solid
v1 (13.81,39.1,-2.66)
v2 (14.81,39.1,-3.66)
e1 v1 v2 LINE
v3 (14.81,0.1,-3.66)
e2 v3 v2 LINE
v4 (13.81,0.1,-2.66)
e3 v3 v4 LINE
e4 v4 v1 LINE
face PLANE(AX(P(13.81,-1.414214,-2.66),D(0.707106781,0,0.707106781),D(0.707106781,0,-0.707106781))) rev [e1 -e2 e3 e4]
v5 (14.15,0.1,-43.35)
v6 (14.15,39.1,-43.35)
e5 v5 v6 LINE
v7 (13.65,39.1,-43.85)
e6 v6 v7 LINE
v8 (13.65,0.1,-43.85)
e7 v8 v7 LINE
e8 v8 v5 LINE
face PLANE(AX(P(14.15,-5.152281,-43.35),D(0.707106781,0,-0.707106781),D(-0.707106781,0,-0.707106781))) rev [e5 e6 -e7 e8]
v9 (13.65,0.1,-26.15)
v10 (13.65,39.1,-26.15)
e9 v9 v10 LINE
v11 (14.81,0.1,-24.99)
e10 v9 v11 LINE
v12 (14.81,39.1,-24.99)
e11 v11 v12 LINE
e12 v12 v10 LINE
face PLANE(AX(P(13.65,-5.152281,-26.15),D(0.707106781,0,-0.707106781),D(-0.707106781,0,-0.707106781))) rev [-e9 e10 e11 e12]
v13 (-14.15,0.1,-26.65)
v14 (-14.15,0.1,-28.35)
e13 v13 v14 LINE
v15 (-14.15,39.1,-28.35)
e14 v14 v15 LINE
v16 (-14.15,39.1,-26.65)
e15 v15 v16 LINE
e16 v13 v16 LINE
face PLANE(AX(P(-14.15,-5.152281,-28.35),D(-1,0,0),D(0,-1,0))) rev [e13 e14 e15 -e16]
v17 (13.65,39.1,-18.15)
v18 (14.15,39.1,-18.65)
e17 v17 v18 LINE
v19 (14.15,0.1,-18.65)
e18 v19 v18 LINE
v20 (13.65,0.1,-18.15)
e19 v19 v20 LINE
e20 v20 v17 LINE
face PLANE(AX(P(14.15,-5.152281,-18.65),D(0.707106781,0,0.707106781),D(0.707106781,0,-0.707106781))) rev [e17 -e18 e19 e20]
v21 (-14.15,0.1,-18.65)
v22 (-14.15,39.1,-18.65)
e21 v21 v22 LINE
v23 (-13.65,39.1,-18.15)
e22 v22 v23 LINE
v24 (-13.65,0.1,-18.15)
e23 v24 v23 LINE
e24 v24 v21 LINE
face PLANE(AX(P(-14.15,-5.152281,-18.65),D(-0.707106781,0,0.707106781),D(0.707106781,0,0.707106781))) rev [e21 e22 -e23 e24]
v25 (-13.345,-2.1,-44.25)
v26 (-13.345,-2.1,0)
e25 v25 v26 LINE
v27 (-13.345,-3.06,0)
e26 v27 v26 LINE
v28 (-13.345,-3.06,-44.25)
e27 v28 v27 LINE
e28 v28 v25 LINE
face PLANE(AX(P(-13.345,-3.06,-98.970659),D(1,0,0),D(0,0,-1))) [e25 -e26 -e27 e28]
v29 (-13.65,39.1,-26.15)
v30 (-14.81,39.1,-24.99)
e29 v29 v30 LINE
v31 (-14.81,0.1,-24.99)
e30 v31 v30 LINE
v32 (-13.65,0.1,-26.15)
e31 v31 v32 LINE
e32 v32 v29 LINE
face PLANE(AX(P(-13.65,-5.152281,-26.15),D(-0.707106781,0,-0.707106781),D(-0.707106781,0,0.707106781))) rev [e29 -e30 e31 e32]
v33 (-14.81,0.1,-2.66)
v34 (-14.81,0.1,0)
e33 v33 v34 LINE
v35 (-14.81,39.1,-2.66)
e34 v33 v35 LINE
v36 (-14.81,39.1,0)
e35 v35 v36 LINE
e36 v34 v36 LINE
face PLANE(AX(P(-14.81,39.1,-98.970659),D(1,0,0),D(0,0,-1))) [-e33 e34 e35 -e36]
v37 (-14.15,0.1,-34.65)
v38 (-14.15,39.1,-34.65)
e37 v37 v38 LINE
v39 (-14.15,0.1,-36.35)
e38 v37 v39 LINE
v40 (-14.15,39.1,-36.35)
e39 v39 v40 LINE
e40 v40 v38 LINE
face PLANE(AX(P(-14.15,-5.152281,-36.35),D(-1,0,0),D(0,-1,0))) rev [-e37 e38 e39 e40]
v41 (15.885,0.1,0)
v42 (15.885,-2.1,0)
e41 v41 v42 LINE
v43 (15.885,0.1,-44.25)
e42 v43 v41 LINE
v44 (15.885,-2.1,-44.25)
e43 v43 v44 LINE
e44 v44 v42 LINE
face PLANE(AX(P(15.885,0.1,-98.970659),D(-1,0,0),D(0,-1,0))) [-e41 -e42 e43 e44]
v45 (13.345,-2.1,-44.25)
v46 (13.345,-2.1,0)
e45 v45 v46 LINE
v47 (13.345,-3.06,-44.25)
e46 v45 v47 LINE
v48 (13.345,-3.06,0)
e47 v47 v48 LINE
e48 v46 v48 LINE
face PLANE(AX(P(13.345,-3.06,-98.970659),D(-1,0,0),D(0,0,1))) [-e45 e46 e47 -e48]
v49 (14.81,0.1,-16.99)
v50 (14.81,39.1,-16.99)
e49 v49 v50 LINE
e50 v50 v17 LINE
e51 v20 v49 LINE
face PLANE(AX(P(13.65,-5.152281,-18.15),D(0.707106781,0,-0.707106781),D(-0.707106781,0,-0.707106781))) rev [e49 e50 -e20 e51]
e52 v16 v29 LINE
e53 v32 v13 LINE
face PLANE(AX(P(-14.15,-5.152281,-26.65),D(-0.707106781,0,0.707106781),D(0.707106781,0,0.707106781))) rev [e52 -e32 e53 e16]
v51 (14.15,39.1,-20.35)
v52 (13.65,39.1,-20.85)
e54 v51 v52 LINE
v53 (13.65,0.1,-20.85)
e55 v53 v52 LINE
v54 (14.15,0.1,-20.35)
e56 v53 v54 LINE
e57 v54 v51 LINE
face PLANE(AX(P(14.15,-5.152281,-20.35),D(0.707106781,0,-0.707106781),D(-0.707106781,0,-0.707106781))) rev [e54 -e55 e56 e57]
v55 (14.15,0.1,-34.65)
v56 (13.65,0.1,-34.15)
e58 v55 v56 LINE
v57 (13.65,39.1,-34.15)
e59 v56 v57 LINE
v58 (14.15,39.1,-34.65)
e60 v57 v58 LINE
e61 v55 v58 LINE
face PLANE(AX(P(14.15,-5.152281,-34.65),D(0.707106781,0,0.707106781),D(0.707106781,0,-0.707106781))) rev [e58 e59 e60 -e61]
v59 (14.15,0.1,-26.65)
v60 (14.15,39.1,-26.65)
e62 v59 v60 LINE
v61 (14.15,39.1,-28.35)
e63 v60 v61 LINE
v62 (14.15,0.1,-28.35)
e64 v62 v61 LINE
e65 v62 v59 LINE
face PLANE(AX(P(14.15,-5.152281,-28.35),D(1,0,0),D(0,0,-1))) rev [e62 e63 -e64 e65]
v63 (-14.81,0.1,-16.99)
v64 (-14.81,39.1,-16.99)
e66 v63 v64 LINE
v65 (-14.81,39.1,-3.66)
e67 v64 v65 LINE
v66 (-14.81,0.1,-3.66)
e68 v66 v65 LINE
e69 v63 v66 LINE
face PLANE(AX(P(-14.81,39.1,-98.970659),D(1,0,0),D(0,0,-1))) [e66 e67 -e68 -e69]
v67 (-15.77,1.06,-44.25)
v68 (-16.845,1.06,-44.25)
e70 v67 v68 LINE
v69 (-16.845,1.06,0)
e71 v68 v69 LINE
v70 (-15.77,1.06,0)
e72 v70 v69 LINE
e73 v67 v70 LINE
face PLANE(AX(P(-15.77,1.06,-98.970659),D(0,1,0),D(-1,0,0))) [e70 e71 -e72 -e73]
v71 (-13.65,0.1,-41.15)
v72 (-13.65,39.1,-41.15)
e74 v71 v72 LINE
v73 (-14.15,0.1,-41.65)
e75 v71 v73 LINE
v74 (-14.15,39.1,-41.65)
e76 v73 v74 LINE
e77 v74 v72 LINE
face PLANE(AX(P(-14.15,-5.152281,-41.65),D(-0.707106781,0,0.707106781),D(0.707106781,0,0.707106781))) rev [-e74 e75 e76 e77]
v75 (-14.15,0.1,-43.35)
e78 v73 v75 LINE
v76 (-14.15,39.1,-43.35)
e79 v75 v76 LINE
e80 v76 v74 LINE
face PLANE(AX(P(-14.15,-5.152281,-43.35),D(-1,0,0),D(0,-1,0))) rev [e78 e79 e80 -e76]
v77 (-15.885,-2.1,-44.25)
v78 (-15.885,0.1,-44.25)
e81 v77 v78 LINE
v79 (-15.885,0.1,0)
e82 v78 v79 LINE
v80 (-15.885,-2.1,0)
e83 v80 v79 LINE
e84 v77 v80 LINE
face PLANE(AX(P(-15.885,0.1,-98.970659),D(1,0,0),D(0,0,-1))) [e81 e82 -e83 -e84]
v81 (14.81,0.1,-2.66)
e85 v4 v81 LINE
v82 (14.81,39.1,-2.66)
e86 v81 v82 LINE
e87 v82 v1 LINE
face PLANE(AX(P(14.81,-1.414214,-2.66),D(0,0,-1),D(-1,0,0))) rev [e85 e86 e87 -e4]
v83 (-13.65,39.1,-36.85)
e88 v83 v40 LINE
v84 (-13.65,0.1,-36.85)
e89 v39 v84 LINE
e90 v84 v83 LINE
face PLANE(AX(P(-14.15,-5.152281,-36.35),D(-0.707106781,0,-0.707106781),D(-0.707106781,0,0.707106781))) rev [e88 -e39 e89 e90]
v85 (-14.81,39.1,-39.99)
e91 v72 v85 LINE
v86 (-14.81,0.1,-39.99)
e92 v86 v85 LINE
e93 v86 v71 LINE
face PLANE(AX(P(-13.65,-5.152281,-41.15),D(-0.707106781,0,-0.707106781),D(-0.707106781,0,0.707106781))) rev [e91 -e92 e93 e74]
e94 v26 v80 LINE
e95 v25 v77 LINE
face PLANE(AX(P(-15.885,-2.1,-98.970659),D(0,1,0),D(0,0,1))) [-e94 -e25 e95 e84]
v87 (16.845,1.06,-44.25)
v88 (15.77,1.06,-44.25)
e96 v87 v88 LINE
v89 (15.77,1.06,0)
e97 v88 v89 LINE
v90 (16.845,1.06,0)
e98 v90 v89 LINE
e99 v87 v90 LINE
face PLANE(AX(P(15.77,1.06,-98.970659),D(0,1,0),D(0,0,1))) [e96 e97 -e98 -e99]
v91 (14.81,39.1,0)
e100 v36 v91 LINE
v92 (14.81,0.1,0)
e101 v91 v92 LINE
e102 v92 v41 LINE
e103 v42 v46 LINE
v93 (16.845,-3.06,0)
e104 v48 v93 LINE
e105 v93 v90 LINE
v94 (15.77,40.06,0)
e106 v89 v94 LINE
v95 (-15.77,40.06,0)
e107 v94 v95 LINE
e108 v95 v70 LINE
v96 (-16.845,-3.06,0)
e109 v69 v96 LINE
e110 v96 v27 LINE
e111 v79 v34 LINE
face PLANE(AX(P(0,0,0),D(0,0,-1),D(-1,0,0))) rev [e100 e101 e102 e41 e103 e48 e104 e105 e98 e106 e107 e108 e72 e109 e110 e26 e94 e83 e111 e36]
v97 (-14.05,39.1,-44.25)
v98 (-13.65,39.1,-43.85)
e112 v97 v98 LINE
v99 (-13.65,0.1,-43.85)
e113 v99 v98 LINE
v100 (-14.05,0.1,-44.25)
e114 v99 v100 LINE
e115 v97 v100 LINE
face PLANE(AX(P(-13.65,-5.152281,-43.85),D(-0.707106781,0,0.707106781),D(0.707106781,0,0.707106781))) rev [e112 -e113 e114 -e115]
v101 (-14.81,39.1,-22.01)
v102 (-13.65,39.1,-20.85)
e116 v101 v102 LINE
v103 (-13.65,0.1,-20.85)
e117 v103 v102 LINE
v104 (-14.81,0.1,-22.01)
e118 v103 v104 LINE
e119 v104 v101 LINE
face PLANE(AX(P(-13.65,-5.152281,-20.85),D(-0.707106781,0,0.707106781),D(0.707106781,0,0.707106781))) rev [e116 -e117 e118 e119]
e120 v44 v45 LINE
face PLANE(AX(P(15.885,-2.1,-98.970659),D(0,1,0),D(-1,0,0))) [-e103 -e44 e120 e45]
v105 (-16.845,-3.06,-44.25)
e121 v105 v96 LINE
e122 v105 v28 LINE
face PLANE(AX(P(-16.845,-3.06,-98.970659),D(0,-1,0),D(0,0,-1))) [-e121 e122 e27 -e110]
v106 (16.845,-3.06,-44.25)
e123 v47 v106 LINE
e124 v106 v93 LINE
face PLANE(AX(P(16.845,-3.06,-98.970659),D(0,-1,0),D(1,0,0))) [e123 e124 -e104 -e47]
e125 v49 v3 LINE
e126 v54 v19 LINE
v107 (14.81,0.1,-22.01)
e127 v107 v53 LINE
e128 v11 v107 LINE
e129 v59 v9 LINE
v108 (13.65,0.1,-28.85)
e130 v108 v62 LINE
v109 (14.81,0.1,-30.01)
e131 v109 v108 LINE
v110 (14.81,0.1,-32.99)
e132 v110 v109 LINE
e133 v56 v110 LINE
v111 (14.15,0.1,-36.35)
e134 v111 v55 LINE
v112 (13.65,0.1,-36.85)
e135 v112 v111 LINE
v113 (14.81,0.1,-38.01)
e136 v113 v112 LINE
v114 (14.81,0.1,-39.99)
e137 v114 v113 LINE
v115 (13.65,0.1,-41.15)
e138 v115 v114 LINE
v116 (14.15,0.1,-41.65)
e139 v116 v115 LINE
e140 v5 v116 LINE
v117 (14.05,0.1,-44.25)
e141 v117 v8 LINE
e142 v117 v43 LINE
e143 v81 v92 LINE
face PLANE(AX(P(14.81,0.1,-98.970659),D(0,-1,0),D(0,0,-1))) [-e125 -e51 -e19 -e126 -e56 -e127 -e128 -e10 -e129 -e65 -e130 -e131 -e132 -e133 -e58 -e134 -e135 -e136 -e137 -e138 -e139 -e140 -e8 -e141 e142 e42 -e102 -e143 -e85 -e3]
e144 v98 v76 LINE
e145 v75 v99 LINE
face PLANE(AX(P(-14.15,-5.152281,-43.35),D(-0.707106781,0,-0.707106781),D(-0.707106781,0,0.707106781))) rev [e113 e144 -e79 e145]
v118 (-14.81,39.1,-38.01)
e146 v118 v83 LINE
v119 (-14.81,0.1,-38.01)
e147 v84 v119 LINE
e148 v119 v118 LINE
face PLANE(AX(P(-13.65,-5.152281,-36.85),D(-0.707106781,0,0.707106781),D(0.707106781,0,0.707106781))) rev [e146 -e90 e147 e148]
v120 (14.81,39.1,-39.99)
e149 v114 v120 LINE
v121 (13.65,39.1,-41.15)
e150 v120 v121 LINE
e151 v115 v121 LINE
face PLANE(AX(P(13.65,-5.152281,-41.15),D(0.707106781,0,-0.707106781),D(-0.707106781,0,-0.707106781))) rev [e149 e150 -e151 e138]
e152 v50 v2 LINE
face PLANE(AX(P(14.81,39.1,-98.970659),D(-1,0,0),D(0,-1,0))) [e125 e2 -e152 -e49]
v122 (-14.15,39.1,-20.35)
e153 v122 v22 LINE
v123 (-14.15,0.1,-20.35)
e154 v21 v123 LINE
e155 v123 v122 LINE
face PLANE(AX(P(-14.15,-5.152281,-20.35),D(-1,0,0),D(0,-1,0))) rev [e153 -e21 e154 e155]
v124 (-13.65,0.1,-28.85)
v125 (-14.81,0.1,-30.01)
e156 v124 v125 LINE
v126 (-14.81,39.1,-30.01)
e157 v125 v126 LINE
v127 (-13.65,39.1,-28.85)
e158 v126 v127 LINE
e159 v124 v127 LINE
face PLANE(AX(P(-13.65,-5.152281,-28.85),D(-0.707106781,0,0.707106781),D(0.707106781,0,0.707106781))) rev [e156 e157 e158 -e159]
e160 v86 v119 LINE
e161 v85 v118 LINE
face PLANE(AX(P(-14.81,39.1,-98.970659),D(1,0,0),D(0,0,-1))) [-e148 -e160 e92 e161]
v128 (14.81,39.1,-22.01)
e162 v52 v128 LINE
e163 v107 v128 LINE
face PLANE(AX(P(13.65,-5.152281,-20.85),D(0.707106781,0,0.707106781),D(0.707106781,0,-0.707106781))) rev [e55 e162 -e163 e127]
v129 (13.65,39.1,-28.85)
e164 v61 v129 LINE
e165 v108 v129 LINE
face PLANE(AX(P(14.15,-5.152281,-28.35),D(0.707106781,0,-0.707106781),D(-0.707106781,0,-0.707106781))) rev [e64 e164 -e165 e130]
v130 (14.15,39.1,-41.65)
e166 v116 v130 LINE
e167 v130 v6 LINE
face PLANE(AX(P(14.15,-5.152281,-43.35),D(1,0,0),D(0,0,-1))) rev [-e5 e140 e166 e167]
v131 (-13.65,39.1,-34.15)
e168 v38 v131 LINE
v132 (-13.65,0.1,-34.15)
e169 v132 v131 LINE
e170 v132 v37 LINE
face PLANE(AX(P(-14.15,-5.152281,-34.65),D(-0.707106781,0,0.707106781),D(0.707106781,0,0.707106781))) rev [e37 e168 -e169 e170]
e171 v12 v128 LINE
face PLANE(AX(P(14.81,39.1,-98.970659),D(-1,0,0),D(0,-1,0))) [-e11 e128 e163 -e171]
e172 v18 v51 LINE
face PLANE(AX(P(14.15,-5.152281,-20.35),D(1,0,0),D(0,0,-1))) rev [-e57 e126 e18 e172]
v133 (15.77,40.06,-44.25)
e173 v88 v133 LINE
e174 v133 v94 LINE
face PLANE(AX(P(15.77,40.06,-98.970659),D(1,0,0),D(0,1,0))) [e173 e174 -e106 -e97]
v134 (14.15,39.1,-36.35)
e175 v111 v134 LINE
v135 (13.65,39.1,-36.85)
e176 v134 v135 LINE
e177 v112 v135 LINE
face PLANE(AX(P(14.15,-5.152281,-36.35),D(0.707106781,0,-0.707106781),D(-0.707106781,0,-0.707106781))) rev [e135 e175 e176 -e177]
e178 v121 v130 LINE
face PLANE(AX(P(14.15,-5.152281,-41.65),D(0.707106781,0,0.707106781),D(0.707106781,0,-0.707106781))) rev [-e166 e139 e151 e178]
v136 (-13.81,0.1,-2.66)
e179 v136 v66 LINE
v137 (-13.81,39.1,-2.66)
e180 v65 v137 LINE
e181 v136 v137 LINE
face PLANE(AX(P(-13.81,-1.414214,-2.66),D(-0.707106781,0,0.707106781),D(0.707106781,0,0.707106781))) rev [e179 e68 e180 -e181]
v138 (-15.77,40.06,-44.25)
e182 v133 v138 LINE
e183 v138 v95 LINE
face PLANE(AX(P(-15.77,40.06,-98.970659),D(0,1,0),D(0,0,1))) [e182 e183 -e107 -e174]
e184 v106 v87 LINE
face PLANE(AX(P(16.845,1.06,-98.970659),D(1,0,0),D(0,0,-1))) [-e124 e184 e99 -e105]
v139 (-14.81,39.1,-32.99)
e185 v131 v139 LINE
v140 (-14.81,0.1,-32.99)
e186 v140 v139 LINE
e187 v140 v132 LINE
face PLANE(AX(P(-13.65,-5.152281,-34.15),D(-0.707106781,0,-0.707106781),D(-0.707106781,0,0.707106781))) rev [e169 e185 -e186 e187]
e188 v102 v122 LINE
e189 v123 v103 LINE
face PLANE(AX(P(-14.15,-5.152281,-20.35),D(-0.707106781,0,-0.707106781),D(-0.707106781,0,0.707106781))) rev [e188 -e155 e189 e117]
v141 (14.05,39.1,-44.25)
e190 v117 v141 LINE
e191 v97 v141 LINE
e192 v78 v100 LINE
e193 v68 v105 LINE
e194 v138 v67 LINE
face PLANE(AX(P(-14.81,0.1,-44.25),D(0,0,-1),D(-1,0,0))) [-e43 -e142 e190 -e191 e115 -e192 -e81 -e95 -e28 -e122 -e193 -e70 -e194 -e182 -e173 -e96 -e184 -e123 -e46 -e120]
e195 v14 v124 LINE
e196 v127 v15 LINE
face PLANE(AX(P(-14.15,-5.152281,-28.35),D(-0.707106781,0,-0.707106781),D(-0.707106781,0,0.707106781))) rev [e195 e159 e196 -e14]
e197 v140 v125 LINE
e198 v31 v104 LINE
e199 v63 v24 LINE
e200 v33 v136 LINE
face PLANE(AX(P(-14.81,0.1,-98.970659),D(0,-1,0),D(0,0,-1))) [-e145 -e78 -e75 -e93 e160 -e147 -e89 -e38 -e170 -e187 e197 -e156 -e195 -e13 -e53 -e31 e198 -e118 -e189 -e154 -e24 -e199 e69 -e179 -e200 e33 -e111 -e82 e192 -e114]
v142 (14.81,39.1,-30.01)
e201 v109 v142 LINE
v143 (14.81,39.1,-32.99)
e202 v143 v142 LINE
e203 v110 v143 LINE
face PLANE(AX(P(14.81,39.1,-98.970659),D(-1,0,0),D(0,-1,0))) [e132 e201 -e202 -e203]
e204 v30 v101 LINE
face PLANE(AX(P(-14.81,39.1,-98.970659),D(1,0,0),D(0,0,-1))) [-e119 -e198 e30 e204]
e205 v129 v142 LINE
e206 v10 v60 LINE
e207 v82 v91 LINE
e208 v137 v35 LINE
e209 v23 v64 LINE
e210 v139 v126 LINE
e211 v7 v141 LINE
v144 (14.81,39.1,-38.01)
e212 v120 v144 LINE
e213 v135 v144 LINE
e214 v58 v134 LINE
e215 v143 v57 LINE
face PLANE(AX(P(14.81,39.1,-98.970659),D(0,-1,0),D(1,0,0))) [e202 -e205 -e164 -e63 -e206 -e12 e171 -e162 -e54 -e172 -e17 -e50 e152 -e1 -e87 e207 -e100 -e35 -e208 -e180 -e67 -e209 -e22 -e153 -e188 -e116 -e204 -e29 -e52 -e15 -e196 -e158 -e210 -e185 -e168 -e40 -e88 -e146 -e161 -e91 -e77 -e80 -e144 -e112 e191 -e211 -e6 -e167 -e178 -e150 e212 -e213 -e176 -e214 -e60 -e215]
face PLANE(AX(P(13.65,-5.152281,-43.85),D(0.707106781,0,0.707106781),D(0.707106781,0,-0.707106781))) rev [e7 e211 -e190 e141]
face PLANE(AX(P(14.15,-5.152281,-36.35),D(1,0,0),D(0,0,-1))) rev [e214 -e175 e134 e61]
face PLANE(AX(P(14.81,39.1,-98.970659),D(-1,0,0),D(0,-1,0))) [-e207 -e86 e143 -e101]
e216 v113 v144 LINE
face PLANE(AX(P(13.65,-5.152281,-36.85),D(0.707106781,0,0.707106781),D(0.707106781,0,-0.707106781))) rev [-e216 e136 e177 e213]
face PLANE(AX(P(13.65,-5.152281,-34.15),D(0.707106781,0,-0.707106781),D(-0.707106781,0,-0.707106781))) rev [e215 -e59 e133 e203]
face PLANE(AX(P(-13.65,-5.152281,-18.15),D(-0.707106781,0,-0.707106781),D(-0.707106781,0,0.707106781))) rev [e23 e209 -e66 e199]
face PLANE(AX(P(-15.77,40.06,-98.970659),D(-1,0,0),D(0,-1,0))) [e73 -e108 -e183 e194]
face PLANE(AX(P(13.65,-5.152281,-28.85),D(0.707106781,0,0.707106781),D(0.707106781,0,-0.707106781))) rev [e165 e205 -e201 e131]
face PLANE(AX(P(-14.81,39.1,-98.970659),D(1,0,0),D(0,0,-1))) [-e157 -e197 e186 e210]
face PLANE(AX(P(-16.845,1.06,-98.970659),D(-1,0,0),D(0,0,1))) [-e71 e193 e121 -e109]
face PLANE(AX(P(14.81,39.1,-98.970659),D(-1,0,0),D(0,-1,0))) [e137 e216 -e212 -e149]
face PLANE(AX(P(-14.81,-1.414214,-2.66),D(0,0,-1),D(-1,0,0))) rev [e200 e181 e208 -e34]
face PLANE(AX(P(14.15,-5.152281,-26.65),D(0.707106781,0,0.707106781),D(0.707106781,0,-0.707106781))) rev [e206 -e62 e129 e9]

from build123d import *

# Parameters (mm, degrees)
BOSS_EXTRUDE1_DEPTH = 44.25
BOSS_EXTRUDE2_DEPTH = 39
BOSS_EXTRUDE3_DEPTH = 39
LPATTERN1_START     = 0.1
LPATTERN1_DEPTH     = 39
SPLIT1_START        = 0.1
SPLIT1_DEPTH        = 39
SPLIT1_2_DEPTH      = 39
SPLIT1_3_DEPTH      = 39


# Read off the part's stored shape, not the designer's step: LPattern1, Split1
with BuildPart() as part:
    # Sketch1 → Boss-Extrude1 (new body)
    with BuildSketch(Plane.XY):
        Polygon((-14.81, 0.1), (-15.885, 0.1), (-15.885, -2.1), (-13.345, -2.1), (-13.345, -3.06), (-16.845, -3.06), (-16.845, 1.06), (-15.77, 1.06), (-15.77, 40.06), (0, 40.06), (15.77, 40.06), (15.77, 1.06), (16.845, 1.06), (16.845, -3.06), (13.345, -3.06), (13.345, -2.1), (15.885, -2.1), (15.885, 0.1), (14.81, 0.1), (14.81, 39.1), (0, 39.1), (-14.81, 39.1), align=None)
    extrude(amount=-BOSS_EXTRUDE1_DEPTH)

    # Sketch2 → Boss-Extrude2 (add)
    with BuildSketch(Plane.XZ.offset(-39.1)):
        Polygon((-14.81, -2.66), (-13.81, -2.66), (-14.81, -3.66), align=None)
        Polygon((14.81, -3.66), (14.81, -2.66), (13.81, -2.66), align=None)
    extrude(amount=BOSS_EXTRUDE2_DEPTH)

    # Sketch3 → Boss-Extrude3 (add)
    with BuildSketch(Plane.XZ.offset(-39.1)):
        Polygon((-14.81, -32.99), (-14.81, -38.01), (-13.65, -36.85), (-14.15, -36.35), (-14.15, -34.65), (-13.65, -34.15), align=None)
        Polygon((14.15, -36.35), (13.65, -36.85), (14.81, -38.01), (14.81, -32.99), (13.65, -34.15), (14.15, -34.65), align=None)
    extrude(amount=BOSS_EXTRUDE3_DEPTH)

    # LPattern1 outline → LPattern1 (add)
    with BuildSketch(Plane(origin=(0, 0, 0), x_dir=(1, 0, 0), z_dir=(0, 1, 0)).offset(LPATTERN1_START)):
        Polygon((-13.65, 20.85), (-14.81, 22.01), (-14.81, 16.99), (-13.65, 18.15), (-14.15, 18.65), (-14.15, 20.35), align=None)
        Polygon((-14.15, 26.65), (-14.15, 28.35), (-13.65, 28.85), (-14.81, 30.01), (-14.81, 24.99), (-13.65, 26.15), align=None)
        Polygon((-14.15, 41.65), (-14.15, 43.35), (-13.65, 43.85), (-14.81, 45.01), (-14.81, 39.99), (-13.65, 41.15), align=None)
        Polygon((14.81, 16.99), (14.81, 22.01), (13.65, 20.85), (14.15, 20.35), (14.15, 18.65), (13.65, 18.15), align=None)
        Polygon((14.15, 28.35), (14.15, 26.65), (13.65, 26.15), (14.81, 24.99), (14.81, 30.01), (13.65, 28.85), align=None)
        Polygon((14.15, 43.35), (14.15, 41.65), (13.65, 41.15), (14.81, 39.99), (14.81, 45.01), (13.65, 43.85), align=None)
    extrude(amount=LPATTERN1_DEPTH)

    # Split1 outline → Split1 (cut)
    with BuildSketch(Plane(origin=(0, 0, 0), x_dir=(1, 0, 0), z_dir=(0, 1, 0)).offset(SPLIT1_START)):
        Polygon((14.81, 45.01), (14.05, 44.25), (14.81, 44.25), align=None)
        Polygon((-14.05, 44.25), (-14.81, 45.01), (-14.81, 44.25), align=None)
    extrude(amount=SPLIT1_DEPTH, mode=Mode.SUBTRACT)


with BuildPart() as body_2:
    # Split1 2 outline → Split1 2 (new body)
    with BuildSketch(Plane(origin=(0, 0, 0), x_dir=(1, 0, 0), z_dir=(0, 1, 0)).offset(SPLIT1_START)):
        Polygon((-14.81, 44.25), (-14.05, 44.25), (-14.81, 45.01), align=None)
    extrude(amount=SPLIT1_2_DEPTH)


with BuildPart() as body_3:
    # Split1 3 outline → Split1 3 (new body)
    with BuildSketch(Plane(origin=(0, 0, 0), x_dir=(1, 0, 0), z_dir=(0, 1, 0)).offset(SPLIT1_START)):
        Polygon((14.05, 44.25), (14.81, 44.25), (14.81, 45.01), align=None)
    extrude(amount=SPLIT1_3_DEPTH)


solid = part.part
